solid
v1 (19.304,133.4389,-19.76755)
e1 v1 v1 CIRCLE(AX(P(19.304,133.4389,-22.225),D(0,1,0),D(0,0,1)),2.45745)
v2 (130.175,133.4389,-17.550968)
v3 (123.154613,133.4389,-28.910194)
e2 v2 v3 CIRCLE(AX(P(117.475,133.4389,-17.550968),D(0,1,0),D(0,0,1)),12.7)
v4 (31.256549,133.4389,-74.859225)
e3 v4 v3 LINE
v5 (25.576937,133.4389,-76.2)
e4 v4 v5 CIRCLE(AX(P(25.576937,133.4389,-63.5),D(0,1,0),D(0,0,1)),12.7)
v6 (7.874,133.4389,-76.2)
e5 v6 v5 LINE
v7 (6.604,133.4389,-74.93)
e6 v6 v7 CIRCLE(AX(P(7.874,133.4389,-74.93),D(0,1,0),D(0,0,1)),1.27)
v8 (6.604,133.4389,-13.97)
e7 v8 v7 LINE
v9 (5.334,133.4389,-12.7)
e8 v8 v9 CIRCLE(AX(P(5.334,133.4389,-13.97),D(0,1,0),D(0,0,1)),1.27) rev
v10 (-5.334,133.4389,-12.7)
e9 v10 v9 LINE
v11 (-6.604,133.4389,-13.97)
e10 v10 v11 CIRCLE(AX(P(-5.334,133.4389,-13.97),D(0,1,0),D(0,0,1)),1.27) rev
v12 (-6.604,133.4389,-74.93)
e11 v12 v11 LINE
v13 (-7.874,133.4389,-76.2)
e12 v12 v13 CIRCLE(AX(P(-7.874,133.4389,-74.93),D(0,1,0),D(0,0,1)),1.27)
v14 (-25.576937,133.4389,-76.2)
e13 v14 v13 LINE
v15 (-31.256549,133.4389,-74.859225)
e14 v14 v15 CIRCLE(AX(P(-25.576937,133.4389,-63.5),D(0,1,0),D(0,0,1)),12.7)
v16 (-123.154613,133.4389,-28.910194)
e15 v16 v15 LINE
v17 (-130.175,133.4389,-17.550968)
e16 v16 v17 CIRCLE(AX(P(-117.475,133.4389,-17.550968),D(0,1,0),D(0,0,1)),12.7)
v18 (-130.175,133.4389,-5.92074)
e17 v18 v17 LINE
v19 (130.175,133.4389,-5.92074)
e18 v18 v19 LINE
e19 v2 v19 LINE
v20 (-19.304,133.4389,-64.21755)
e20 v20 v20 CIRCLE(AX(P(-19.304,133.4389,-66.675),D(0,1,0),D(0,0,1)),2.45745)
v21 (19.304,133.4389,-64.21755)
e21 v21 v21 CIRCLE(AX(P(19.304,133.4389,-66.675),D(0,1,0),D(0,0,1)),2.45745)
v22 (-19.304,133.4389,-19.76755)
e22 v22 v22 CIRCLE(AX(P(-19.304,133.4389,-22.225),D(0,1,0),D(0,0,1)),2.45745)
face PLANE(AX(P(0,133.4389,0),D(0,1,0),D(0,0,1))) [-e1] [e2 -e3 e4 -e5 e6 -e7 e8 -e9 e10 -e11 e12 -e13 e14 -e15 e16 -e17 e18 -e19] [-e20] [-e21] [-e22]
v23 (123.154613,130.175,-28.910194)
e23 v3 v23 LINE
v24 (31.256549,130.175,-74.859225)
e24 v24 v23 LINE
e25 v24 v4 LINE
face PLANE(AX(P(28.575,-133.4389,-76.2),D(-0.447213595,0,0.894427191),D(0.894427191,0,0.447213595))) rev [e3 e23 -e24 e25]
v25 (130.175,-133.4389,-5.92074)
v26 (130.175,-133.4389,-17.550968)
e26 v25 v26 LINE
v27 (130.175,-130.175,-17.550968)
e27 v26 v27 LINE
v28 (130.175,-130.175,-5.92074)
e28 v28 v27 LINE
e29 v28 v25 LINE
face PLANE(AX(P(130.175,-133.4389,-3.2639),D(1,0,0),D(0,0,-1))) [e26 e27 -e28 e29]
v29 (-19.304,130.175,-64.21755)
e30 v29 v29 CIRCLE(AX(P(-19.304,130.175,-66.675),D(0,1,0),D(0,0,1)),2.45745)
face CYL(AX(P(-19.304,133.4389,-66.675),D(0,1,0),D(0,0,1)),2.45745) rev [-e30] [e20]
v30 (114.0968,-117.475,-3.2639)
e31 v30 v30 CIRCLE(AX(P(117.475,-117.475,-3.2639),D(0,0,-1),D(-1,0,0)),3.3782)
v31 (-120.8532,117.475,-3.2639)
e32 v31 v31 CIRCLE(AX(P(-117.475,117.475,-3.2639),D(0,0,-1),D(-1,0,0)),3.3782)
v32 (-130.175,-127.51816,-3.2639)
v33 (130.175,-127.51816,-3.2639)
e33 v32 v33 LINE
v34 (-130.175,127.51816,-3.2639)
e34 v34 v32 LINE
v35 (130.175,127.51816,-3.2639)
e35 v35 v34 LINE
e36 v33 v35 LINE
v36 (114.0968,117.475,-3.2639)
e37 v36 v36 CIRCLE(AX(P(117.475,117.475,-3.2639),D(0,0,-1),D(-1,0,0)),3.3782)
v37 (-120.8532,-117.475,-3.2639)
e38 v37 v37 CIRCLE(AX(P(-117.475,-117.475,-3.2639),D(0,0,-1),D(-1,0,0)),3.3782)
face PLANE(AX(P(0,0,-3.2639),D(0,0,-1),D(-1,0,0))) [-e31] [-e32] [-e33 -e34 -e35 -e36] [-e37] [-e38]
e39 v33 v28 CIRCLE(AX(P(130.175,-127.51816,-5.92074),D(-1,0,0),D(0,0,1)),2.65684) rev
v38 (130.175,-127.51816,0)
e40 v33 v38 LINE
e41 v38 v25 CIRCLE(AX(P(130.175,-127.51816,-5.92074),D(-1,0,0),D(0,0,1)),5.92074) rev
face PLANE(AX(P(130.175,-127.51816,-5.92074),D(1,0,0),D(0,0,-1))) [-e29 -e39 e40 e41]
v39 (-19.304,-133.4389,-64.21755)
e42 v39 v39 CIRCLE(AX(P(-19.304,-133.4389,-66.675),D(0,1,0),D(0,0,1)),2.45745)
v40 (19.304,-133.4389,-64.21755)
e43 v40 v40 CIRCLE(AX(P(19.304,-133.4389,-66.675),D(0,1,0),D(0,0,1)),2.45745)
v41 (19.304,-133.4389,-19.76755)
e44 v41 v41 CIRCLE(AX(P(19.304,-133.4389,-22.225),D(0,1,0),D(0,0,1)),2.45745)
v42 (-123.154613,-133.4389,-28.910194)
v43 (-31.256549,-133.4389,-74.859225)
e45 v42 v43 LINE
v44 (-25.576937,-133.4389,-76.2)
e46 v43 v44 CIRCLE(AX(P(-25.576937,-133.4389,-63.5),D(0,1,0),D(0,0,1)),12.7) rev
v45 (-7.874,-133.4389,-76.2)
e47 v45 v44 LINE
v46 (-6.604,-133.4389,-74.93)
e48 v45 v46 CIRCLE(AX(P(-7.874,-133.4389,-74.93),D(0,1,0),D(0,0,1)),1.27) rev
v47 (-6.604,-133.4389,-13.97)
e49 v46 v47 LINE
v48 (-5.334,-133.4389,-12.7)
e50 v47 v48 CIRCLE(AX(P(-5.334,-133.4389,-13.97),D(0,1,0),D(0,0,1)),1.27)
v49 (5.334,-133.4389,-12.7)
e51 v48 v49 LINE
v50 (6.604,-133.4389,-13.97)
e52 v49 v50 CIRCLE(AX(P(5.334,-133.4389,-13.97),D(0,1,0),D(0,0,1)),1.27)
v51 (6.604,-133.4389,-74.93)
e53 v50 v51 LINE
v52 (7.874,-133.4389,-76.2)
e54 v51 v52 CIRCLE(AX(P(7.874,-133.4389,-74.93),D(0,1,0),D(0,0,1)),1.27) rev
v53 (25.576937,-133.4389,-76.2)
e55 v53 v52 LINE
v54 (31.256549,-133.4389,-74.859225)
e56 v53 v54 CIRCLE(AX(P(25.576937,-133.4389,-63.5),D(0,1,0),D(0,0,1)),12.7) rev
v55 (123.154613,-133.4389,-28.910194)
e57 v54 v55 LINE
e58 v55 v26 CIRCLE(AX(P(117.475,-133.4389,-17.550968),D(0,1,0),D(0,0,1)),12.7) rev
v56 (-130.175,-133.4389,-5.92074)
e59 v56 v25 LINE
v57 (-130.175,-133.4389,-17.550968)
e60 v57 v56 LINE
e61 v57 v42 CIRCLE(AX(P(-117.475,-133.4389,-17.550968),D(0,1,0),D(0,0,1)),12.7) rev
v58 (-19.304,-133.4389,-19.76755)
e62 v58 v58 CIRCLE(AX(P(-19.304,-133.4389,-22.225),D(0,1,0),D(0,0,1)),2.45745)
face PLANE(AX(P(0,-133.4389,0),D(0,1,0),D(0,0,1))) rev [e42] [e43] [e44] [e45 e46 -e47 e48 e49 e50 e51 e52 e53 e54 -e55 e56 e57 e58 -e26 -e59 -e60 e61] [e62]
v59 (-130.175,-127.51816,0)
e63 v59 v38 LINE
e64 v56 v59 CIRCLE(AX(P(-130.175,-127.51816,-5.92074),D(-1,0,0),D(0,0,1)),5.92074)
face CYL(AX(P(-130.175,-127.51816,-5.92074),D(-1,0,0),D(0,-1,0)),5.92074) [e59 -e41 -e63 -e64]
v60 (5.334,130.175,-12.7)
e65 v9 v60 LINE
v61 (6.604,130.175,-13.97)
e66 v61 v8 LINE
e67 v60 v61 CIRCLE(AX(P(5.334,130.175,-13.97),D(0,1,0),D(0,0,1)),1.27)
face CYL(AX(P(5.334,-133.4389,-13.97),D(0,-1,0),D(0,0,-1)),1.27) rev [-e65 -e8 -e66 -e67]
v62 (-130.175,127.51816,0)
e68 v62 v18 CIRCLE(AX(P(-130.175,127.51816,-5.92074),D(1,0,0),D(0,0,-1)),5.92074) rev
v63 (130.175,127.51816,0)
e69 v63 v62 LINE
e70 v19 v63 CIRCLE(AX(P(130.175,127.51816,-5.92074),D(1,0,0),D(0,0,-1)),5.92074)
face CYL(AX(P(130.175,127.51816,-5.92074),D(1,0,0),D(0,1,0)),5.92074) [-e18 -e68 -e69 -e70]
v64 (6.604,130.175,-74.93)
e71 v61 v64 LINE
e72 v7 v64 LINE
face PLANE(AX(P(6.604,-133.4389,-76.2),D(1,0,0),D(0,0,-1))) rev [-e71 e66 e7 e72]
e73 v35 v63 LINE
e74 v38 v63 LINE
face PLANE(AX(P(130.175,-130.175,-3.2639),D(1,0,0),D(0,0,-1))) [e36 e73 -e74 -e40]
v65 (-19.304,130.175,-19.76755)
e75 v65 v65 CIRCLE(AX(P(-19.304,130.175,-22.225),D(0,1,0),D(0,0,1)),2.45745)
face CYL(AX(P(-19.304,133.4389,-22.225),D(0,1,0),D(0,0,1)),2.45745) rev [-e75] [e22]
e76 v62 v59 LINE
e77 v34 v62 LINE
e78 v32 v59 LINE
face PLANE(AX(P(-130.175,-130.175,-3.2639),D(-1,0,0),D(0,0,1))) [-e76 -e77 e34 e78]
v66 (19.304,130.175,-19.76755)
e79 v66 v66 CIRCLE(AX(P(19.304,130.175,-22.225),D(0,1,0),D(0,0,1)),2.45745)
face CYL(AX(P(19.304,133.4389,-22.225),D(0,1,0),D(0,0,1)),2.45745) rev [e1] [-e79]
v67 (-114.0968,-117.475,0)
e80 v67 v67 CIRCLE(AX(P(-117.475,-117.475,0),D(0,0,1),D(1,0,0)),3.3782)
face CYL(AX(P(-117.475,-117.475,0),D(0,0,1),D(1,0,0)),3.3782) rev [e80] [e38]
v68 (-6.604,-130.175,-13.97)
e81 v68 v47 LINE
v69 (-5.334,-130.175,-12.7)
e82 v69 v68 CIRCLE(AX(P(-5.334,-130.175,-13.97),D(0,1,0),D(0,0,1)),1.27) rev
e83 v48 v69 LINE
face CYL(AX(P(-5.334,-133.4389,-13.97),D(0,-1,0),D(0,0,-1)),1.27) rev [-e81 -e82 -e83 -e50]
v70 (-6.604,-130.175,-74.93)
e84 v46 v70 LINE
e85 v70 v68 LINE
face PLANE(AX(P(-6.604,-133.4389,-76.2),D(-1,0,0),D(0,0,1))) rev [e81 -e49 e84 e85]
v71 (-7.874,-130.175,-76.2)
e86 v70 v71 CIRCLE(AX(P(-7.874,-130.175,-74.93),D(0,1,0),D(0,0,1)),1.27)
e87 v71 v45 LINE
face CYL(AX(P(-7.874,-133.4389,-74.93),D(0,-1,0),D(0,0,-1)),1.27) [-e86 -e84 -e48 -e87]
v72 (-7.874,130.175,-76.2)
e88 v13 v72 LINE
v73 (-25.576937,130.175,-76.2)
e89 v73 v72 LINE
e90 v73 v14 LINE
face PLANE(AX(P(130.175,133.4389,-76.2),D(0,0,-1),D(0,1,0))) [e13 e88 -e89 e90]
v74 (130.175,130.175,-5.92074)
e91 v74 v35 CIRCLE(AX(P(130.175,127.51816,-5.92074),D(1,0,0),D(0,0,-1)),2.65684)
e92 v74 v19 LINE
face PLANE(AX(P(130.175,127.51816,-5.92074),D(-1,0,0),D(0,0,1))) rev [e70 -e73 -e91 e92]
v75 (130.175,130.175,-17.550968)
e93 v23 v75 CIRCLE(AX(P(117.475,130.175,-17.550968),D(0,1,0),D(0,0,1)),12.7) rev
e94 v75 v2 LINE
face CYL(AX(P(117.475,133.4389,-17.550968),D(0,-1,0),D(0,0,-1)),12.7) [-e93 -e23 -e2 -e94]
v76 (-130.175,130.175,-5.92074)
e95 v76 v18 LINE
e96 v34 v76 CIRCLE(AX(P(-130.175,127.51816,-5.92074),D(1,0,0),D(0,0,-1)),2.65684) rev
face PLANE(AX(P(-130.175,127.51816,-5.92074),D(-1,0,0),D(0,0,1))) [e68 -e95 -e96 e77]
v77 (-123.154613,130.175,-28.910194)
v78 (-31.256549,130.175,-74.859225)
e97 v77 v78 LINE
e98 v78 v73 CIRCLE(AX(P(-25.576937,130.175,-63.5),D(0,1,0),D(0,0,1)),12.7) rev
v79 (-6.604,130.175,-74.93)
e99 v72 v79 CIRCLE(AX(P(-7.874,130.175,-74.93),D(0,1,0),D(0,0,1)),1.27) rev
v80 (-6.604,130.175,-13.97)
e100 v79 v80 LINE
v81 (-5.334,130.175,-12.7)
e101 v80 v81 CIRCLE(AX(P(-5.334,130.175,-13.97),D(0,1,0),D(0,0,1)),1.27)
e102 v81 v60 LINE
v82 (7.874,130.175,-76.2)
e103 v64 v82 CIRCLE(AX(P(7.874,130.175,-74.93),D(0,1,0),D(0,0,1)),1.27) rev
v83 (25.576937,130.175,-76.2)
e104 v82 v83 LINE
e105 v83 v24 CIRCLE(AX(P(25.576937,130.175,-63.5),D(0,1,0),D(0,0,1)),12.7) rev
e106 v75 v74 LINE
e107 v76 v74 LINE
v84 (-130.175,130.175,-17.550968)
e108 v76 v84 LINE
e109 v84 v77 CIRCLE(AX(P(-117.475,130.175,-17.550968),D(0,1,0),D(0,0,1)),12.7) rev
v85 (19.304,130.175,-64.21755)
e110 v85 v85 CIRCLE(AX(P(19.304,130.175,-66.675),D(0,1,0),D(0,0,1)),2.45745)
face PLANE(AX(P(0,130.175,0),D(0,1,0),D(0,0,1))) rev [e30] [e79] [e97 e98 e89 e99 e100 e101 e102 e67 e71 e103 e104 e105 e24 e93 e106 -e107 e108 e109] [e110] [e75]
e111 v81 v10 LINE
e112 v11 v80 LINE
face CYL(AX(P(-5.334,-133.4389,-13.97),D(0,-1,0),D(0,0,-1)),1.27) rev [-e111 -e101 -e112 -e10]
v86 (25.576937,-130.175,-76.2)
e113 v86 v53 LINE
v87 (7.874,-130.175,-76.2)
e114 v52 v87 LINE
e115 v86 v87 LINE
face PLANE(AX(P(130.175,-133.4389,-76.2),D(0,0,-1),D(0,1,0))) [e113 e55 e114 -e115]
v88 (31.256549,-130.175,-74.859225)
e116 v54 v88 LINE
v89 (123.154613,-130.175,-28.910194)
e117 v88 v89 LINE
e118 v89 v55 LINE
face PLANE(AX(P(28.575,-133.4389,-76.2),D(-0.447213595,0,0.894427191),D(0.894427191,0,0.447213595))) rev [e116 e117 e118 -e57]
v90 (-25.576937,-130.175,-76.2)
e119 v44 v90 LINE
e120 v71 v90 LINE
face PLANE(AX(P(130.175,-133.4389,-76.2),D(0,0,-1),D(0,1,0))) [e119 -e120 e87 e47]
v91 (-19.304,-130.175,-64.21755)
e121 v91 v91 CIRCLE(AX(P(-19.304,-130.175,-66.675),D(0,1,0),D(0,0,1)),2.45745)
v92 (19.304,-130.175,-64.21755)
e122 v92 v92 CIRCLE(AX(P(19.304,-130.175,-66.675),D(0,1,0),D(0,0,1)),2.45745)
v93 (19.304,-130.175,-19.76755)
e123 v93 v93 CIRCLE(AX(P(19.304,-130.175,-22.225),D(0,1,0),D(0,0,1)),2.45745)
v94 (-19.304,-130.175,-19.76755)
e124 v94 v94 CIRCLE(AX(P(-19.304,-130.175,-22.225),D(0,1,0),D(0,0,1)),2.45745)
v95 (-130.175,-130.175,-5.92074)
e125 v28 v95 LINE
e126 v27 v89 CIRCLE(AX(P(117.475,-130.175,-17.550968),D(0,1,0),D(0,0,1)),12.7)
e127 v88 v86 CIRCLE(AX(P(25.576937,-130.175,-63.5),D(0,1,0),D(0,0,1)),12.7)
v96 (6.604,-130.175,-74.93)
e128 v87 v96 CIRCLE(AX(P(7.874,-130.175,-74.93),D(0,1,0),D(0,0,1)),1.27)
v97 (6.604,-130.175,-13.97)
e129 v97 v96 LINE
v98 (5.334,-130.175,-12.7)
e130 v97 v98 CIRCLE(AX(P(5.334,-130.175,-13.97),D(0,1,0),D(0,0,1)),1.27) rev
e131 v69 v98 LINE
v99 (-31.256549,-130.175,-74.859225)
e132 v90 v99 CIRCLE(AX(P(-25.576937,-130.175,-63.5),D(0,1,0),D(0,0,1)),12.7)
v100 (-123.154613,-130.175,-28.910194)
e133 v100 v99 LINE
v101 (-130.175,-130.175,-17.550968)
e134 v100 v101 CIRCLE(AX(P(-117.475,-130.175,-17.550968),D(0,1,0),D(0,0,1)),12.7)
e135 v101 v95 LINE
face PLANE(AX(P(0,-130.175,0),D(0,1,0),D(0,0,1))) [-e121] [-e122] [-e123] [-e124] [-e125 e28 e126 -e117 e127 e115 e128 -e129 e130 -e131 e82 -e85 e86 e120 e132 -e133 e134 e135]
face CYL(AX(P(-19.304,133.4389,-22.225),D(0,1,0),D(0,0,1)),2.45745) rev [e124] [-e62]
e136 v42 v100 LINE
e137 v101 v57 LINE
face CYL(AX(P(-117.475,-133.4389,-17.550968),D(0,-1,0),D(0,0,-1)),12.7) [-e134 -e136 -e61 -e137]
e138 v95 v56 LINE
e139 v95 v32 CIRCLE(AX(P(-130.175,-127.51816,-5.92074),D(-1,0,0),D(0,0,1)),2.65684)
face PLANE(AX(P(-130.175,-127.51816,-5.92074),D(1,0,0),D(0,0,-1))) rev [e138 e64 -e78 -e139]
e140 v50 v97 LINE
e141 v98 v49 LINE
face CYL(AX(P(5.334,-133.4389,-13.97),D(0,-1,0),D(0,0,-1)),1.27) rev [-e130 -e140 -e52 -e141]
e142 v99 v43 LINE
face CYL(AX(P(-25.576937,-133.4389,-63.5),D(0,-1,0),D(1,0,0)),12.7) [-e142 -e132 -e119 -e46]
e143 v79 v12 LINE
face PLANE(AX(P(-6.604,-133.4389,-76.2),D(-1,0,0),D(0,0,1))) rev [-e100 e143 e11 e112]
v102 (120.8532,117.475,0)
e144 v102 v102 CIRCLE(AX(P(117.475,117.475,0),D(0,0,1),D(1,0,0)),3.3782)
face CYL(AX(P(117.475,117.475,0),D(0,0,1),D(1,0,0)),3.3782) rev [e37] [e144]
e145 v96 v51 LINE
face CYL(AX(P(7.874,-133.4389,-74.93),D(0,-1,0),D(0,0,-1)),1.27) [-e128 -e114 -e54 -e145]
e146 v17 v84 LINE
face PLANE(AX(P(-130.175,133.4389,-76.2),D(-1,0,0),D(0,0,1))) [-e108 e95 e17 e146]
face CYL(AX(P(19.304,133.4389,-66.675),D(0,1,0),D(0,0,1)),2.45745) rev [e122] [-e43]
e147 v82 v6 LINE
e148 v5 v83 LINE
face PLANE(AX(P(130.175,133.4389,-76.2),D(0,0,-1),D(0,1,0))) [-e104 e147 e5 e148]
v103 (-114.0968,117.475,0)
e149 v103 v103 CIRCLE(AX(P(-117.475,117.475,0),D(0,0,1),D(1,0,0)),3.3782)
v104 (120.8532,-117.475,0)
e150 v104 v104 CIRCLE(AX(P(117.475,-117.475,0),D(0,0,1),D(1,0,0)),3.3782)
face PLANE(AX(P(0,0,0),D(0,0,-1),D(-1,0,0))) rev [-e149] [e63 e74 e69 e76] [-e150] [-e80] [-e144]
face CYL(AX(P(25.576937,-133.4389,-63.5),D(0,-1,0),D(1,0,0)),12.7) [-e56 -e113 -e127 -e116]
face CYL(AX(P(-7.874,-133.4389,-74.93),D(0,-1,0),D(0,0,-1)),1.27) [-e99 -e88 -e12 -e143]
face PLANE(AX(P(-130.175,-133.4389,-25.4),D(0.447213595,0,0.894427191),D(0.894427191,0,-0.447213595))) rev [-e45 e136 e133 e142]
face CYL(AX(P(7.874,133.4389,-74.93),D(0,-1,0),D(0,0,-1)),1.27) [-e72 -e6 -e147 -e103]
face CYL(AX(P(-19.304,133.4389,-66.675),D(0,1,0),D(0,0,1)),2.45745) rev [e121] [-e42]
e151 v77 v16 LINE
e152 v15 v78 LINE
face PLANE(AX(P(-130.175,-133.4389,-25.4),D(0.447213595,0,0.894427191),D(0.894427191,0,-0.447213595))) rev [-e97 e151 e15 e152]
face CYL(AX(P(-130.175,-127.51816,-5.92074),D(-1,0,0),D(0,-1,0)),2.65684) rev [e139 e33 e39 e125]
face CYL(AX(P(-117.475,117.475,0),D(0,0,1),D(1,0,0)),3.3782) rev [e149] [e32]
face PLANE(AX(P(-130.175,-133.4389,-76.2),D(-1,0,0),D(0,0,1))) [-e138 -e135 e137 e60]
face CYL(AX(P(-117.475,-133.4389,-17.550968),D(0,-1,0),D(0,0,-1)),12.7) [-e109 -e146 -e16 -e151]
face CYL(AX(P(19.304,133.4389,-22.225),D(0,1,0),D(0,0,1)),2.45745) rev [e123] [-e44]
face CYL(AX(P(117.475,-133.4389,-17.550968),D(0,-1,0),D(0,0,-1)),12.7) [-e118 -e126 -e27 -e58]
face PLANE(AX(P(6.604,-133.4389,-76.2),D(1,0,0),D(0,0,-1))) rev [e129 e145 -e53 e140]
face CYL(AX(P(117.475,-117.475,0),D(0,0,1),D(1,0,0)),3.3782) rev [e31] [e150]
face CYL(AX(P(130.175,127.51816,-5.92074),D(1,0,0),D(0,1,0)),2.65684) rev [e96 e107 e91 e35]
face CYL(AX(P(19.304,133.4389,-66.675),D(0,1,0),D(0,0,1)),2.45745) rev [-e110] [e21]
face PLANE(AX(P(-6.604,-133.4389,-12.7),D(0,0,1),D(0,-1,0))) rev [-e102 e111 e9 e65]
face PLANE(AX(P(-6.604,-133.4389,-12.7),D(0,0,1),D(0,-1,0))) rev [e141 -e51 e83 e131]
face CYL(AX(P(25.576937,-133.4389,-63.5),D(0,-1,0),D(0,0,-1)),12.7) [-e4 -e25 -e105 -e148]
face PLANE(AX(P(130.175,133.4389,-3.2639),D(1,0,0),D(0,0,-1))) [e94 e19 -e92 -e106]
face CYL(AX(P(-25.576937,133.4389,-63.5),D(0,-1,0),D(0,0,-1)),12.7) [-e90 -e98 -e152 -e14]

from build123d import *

# Parameters (mm, degrees)
SKETCH1_W                      = 260.35
SKETCH1_H                      = 260.35
BASE_FLANGE1_DEPTH             = 3.2639
EDGE_FLANGE1_STRIP_W           = 18.36928
EDGE_FLANGE1_STRIP_H           = 3.2639
EDGE_FLANGE1_STRIP_CUT_DEPTH   = 260.35
EDGE_FLANGE1_STRIP_2_W         = 18.36928
EDGE_FLANGE1_STRIP_2_H         = 3.2639
EDGE_FLANGE1_STRIP_CUT_2_DEPTH = 260.35
EDGE_FLANGE1_DEPTH             = 260.35
EDGE_FLANGE1_BEND_DEPTH        = 260.35
SKETCH16_W                     = 13.208
SKETCH16_H                     = 63.5
CUT_EXTRUDE1_DEPTH             = 307.55461301
CUT_EXTRUDE2_DEPTH             = 307.55461301
FILLET1_R                      = 12.7
F_10_0_1935_DIAMETER_HOLE1_D   = 4.9149
FILLET2_R                      = 1.27
F_1_4_CLEARANCE_HOLE1_D        = 6.7564


# Sheet-metal steps are written as plain solids
with BuildPart() as part:
    # Sketch1 → Base-Flange1 (new body)
    with BuildSketch(Plane.XY):
        Rectangle(SKETCH1_W, SKETCH1_H)
    extrude(amount=-BASE_FLANGE1_DEPTH)

    # Edge-Flange1 strip (across the edge) → Edge-Flange1 strip cut (cut)
    with BuildSketch(Plane(origin=(-130.175, 130.175, -3.2639), x_dir=(0, -1, 0), z_dir=(1, 0, 0))):
        with Locations((-6.5278, -1.63195)):
            Rectangle(EDGE_FLANGE1_STRIP_W, EDGE_FLANGE1_STRIP_H)
    extrude(amount=EDGE_FLANGE1_STRIP_CUT_DEPTH, mode=Mode.SUBTRACT)

    # Edge-Flange1 strip 2 (across the edge) → Edge-Flange1 strip cut 2 (cut)
    with BuildSketch(Plane(origin=(130.175, -130.175, -3.2639), x_dir=(0, 1, 0), z_dir=(-1, 0, 0))):
        with Locations((-6.5278, -1.63195)):
            Rectangle(EDGE_FLANGE1_STRIP_2_W, EDGE_FLANGE1_STRIP_2_H)
    extrude(amount=EDGE_FLANGE1_STRIP_CUT_2_DEPTH, mode=Mode.SUBTRACT)

    # Edge-Flange1 section (across the edge) → Edge-Flange1 (add)
    with BuildSketch(Plane(origin=(-130.175, 130.175, -3.2639), x_dir=(0, -1, 0), z_dir=(1, 0, 0))):
        with BuildLine():
            Line((-3.2639, 2.65684), (-3.2639, 72.9361))
            Line((-3.2639, 72.9361), (0, 72.9361))
            Line((0, 72.9361), (0, 2.65684))
            ThreePointArc((0, 2.65684), (0.778170419, 0.778170419), (2.65684, 0))
            Line((2.65684, 0), (2.65684, -3.2639))
            ThreePointArc((2.65684, -3.2639), (-1.529755404, -1.529755404), (-3.2639, 2.65684))
        make_face()
    extrude(amount=EDGE_FLANGE1_DEPTH)

    # Edge-Flange1 section 2 (across the edge) → Edge-Flange1 bend (add)
    with BuildSketch(Plane(origin=(130.175, -130.175, -3.2639), x_dir=(0, 1, 0), z_dir=(-1, 0, 0))):
        with BuildLine():
            Line((-3.2639, 2.65684), (-3.2639, 72.9361))
            Line((-3.2639, 72.9361), (0, 72.9361))
            Line((0, 72.9361), (0, 2.65684))
            ThreePointArc((0, 2.65684), (0.778170419, 0.778170419), (2.65684, 0))
            Line((2.65684, 0), (2.65684, -3.2639))
            ThreePointArc((2.65684, -3.2639), (-1.529755404, -1.529755404), (-3.2639, 2.65684))
        make_face()
    extrude(amount=EDGE_FLANGE1_BEND_DEPTH)

    # Sketch16 → Cut-Extrude1 (cut, through all)
    with BuildSketch(Plane(origin=(0, 133.4389, 0), x_dir=(1, 0, 0), z_dir=(0, 1, 0))):
        with Locations((0, 44.45)):
            Rectangle(SKETCH16_W, SKETCH16_H)
    extrude(amount=-CUT_EXTRUDE1_DEPTH, mode=Mode.SUBTRACT)

    # Sketch18 → Cut-Extrude2 (cut, through all)
    with BuildSketch(Plane(origin=(0, 133.4389, 0), x_dir=(1, 0, 0), z_dir=(0, 1, 0))):
        Polygon((-130.175, 76.2), (-130.175, 25.4), (-28.575, 76.2), align=None)
        Polygon((130.175, 76.2), (28.575, 76.2), (130.175, 25.4), align=None)
    extrude(amount=-CUT_EXTRUDE2_DEPTH, mode=Mode.SUBTRACT)

    # Fillet1
    fillet1_edges = [part.edges().sort_by_distance(p)[0] for p in [
        (-28.575, 131.80695, -76.2),
        (-130.175, 131.80695, -25.4),
        (-28.575, -131.80695, -76.2),
        (-130.175, -131.80695, -25.4),
        (28.575, 131.80695, -76.2),
        (130.175, 131.80695, -25.4),
        (130.175, -131.80695, -25.4),
        (28.575, -131.80695, -76.2),
    ]]
    fillet(fillet1_edges, radius=FILLET1_R)

    # #10 (0.1935) Diameter Hole1 (through all)
    with Locations(Plane(origin=(0, 133.4389, 0), x_dir=(1, 0, 0), z_dir=(0, 1, 0))):
        with Locations((-19.304, 22.225), (-19.304, 66.675), (19.304, 66.675), (19.304, 22.225)):
            Hole(F_10_0_1935_DIAMETER_HOLE1_D / 2)

    # Fillet2
    fillet2_edges = [part.edges().sort_by_distance(p)[0] for p in [
        (-6.604, 131.80695, -76.2),
        (6.604, 131.80695, -12.7),
        (-6.604, 131.80695, -12.7),
        (6.604, 131.80695, -76.2),
        (-6.604, -131.80695, -12.7),
        (-6.604, -131.80695, -76.2),
        (6.604, -131.80695, -76.2),
        (6.604, -131.80695, -12.7),
    ]]
    fillet(fillet2_edges, radius=FILLET2_R)

    # 1/4 Clearance Hole1 (through all)
    with Locations(Plane.XY):
        with Locations((117.475, 117.475), (-117.475, -117.475), (-117.475, 117.475), (117.475, -117.475)):
            Hole(F_1_4_CLEARANCE_HOLE1_D / 2)


solid = part.part
